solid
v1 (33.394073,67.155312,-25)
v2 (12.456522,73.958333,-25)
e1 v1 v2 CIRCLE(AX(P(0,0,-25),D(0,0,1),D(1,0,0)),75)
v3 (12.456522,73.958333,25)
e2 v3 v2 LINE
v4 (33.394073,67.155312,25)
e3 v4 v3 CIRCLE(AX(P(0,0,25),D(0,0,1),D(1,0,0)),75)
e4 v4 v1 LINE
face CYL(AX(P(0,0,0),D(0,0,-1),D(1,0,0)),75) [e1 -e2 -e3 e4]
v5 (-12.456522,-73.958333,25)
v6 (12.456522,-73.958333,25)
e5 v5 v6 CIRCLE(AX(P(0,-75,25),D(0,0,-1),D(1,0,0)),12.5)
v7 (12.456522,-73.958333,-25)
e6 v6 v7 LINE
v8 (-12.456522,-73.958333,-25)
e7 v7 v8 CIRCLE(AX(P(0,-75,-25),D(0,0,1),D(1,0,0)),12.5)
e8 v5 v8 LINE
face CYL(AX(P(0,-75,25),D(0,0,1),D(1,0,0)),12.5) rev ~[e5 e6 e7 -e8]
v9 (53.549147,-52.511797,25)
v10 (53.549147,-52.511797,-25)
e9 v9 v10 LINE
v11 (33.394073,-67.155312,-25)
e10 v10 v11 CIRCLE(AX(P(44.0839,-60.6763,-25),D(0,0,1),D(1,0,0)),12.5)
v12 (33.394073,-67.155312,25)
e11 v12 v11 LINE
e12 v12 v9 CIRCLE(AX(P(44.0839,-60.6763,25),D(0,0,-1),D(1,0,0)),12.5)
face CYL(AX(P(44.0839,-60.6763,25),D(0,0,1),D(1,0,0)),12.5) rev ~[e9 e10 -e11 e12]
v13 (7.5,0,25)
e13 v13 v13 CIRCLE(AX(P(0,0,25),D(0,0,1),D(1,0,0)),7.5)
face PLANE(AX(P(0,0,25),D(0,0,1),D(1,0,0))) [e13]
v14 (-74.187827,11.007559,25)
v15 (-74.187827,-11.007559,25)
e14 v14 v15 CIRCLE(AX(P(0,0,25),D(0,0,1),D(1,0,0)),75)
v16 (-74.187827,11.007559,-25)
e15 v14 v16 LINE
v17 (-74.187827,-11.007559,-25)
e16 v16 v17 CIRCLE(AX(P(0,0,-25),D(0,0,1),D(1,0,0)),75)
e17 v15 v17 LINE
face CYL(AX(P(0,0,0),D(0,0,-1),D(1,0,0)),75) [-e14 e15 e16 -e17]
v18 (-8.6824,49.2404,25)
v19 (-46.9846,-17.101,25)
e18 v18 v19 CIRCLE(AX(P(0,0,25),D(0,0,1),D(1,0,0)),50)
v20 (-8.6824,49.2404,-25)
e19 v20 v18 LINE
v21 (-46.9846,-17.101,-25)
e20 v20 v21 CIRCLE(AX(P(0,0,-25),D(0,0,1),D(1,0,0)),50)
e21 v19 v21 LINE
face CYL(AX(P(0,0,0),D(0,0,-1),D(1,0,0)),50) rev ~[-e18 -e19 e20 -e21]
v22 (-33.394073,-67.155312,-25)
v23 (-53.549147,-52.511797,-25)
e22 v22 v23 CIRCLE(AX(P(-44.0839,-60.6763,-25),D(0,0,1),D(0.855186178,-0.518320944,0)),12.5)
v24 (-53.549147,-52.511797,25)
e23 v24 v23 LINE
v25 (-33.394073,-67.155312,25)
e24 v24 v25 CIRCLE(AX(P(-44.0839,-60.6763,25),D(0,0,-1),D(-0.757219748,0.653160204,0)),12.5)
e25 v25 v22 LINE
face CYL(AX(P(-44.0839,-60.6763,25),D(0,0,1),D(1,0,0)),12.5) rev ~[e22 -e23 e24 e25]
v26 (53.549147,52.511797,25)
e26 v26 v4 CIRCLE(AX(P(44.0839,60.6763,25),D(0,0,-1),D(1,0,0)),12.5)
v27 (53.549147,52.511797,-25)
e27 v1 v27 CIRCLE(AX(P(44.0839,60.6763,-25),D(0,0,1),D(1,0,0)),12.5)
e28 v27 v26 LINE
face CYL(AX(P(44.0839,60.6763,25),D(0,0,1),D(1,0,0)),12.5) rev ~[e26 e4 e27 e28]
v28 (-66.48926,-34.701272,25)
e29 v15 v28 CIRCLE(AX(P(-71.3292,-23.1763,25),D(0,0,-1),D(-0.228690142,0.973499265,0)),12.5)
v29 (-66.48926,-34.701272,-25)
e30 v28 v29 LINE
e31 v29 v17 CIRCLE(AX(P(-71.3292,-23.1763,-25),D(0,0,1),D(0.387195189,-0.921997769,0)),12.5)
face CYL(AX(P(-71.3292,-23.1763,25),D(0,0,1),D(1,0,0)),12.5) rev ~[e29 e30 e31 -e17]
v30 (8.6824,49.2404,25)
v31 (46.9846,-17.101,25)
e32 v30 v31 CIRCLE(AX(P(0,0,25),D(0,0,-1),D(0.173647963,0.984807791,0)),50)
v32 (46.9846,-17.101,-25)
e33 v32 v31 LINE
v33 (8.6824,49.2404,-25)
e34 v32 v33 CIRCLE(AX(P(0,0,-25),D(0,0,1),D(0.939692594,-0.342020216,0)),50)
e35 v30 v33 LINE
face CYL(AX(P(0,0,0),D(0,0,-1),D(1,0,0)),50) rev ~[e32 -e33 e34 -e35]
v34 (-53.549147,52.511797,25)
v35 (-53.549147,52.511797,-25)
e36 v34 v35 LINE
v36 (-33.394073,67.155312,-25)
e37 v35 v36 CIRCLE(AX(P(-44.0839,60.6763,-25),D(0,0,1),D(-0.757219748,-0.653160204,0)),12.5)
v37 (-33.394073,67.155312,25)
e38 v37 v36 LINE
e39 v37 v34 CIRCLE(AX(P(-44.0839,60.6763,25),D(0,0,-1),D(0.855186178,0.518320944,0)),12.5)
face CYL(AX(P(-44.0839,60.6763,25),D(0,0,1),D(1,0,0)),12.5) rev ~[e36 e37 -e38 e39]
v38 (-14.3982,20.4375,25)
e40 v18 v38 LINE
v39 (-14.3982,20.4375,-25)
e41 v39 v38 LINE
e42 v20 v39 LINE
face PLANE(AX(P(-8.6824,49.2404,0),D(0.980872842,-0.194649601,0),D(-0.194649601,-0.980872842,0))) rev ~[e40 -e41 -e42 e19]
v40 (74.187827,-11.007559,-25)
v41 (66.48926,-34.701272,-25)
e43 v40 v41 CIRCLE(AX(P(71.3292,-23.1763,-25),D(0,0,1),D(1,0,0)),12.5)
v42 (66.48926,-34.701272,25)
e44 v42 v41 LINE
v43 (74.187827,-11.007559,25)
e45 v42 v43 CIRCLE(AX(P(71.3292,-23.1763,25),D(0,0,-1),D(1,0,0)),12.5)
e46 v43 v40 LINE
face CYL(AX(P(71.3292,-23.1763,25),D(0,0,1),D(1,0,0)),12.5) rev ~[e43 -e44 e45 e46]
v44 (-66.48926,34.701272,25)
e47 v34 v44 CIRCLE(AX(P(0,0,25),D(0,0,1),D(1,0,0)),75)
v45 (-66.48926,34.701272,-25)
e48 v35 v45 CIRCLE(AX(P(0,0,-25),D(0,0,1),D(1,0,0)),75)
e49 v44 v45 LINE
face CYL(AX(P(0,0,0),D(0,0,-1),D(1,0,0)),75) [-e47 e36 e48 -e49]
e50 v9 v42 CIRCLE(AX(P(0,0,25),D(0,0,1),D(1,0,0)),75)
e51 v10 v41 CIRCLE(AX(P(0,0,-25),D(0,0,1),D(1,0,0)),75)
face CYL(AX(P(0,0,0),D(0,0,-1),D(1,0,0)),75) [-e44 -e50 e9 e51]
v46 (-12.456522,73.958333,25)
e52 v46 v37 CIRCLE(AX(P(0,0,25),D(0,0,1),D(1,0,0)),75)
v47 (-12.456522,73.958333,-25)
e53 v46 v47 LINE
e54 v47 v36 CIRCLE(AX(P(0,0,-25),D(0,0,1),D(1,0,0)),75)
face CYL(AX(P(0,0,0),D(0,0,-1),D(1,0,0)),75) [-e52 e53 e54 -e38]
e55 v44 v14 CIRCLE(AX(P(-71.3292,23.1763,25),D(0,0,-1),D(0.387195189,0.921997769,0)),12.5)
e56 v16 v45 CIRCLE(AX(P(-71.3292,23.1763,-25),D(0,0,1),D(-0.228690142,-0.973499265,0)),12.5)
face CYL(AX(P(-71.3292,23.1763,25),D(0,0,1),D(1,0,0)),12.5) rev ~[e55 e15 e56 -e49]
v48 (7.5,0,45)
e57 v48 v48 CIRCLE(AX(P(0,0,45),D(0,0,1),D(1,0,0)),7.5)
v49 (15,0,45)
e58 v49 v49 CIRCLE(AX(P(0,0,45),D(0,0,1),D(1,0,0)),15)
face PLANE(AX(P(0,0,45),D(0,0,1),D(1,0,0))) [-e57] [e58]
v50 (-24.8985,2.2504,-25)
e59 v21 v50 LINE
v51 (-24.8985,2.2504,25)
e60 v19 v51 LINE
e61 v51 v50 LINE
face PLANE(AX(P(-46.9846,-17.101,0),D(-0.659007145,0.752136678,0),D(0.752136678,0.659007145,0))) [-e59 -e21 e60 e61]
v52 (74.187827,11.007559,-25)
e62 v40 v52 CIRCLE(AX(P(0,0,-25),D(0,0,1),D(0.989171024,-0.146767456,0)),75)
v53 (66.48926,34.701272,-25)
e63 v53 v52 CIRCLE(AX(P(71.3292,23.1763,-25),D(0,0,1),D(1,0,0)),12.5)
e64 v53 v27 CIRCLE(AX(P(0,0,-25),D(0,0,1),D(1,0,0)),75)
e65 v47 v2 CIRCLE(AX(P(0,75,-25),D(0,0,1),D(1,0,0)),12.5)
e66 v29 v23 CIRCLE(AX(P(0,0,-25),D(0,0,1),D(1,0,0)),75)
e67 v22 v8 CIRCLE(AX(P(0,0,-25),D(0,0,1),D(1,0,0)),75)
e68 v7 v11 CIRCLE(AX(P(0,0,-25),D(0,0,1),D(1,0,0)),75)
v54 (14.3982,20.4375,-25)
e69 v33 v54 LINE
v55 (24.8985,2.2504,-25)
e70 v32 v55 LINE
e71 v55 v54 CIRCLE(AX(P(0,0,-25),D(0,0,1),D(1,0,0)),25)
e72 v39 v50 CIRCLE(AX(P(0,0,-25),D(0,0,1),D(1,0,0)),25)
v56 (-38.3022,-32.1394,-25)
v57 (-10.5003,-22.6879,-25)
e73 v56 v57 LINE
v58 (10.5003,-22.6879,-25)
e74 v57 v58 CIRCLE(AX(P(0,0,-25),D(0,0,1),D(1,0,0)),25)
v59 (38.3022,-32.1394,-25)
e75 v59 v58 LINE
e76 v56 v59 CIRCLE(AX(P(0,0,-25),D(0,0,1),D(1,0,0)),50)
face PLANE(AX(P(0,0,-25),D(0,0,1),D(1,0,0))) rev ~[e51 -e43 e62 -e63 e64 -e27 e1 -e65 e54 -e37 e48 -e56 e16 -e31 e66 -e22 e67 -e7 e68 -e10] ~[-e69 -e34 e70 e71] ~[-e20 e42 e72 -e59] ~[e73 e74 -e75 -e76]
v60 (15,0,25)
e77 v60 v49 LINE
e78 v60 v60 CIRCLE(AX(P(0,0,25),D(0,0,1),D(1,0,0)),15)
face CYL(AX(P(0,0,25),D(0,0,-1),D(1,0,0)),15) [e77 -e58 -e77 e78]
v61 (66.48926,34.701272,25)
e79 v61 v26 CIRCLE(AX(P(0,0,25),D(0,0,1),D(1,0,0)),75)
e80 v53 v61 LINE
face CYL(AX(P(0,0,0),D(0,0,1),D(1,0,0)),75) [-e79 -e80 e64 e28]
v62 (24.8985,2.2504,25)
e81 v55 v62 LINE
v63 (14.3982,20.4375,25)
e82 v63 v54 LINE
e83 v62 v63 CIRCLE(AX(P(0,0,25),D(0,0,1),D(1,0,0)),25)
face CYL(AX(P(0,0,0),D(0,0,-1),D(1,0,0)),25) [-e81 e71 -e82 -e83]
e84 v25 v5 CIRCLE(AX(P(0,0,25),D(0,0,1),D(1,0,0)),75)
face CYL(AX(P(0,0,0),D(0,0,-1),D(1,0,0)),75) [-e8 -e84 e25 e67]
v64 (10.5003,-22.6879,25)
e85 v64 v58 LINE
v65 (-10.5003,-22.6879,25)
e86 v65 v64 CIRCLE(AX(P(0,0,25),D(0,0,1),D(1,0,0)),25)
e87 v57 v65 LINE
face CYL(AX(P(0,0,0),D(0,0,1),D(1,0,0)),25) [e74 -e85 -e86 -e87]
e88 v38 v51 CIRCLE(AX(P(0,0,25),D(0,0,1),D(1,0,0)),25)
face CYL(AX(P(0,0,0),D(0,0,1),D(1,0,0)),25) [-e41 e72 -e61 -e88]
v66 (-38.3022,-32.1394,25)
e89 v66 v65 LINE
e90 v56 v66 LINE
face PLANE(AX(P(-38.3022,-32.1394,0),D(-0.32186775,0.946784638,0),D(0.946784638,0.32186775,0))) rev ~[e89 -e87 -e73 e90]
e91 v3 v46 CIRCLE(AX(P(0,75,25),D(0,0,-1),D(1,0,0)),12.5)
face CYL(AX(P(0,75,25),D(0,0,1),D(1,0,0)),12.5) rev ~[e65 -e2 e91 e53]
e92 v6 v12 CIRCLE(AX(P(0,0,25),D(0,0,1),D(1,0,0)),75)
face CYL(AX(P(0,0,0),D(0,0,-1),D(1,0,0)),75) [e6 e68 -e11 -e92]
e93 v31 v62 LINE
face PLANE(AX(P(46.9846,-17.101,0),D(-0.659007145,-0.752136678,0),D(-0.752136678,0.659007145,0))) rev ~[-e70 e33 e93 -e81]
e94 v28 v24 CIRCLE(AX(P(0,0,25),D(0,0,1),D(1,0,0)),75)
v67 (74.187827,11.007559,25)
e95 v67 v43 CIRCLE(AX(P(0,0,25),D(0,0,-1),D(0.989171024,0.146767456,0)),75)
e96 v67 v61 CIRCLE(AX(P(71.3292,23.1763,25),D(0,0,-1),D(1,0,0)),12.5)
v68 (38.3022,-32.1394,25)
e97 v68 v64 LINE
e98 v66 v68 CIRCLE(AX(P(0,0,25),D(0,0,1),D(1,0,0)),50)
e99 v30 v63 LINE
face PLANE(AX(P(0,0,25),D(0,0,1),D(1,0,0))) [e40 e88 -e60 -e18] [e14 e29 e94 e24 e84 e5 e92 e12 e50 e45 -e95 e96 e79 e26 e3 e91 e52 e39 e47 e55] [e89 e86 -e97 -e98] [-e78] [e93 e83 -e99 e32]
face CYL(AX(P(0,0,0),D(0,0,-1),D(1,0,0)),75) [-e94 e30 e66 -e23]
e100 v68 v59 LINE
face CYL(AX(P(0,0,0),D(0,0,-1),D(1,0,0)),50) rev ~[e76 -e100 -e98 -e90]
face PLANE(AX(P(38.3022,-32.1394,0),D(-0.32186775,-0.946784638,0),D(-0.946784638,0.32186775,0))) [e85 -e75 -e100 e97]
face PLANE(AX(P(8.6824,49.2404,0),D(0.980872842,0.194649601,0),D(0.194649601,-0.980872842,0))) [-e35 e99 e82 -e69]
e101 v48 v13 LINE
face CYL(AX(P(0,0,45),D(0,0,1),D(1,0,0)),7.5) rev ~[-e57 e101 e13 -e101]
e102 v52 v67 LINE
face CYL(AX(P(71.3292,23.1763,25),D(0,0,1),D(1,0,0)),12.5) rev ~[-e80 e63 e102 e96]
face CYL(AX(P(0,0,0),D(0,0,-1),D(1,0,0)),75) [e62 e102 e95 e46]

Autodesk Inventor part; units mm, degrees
ref_plane "YZ Plane" through (0, 0, 0) normal (1, 0, 0) x (0, 1, 0)
ref_plane "XZ Plane" through (0, 0, 0) normal (0, 1, 0) x (-1, 0, 0)
ref_plane "XY Plane" through (0, 0, 0) normal (0, 0, 1) x (1, 0, 0)
sketch "Sketch1" plane through (0, 0, 0) normal (0, 0, 1) x (1, 0, 0)
  circle A0 centre (0, 0) radius 75
  dimension "d0" = 150
extrude "Extrusion1" add sketch "Sketch1" along normal mid plane 50
sketch "Sketch2" plane through (0, 0, 0) normal (0, 0, 1) x (1, 0, 0)
  circle A0 centre (0, 0) radius 50
  dimension "d3" = 100
extrude "Extrusion2" cut sketch "Sketch2" along normal mid plane 50
sketch "Sketch3" plane through (0, 0, 0) normal (0, 0, 1) x (1, 0, 0)
  circle A0 centre (0, 0) radius 25
  dimension "d6" = 50
extrude "Extrusion3" add sketch "Sketch3" along normal mid plane 50
sketch "Sketch10" plane through (0, 0, 25) normal (0, 0, 1) x (1, 0, 0)
  circle A0 centre (0, 0) radius 75 projected
  circle A1 centre (0, 75) radius 12.5
  circle A2 centre (-44.0839, 60.6763) radius 12.5
  circle A3 centre (-71.3292, 23.1763) radius 12.5
  circle A4 centre (-71.3292, -23.1763) radius 12.5
  circle A5 centre (-44.0839, -60.6763) radius 12.5
  circle A6 centre (0, -75) radius 12.5
  circle A7 centre (44.0839, -60.6763) radius 12.5
  circle A8 centre (71.3292, -23.1763) radius 12.5
  circle A9 centre (71.3292, 23.1763) radius 12.5
  circle A10 centre (44.0839, 60.6763) radius 12.5
  dimension "d46" = 25
  dimension "d49" = 360
extrude "Extrusion9" cut sketch "Sketch10" against normal through all contours A9 A0 | A0 A9 | A8 A0 | A0 A8 | A10 A0 | A0 A10 | A7 A0 | A0 A7 | A1 A0 | A0 A1 | A6 A0 | A0 A6 | A2 A0 | A0 A2 | A5 A0 | A0 A5 | A3 A0 | A0 A3 | A4 A0 | A0 A4
sketch "Sketch11" plane through (0, 0, 0) normal (0, 0, 1) x (1, 0, 0)
  circle A0 centre (0, 0) radius 25 construction
  circle A1 centre (0, 0) radius 50 construction
  line L0 (0, 0) -> (50, 0) construction
  line L1 (-8.6824, 49.2404) -> (-14.3982, 20.4375)
  line L2 (8.6824, 49.2404) -> (14.3982, 20.4375)
  line L3 (-38.3022, -32.1394) -> (-10.5003, -22.6879)
  line L4 (-46.9846, -17.101) -> (-24.8985, 2.2504)
  line L5 (46.9846, -17.101) -> (24.8985, 2.2504)
  line L6 (38.3022, -32.1394) -> (10.5003, -22.6879)
  arc A2 (8.6824, 49.2404) -> (-8.6824, 49.2404) centre (0, 0) ccw
  arc A3 (-46.9846, -17.101) -> (-38.3022, -32.1394) centre (0, 0) ccw
  arc A4 (38.3022, -32.1394) -> (50, 0) centre (0, 0) ccw
  arc A5 (10.5003, -22.6879) -> (24.8985, 2.2504) centre (0, 0) ccw
  arc A6 (14.3982, 20.4375) -> (-14.3982, 20.4375) centre (0, 0) ccw
  arc A7 (-24.8985, 2.2504) -> (-10.5003, -22.6879) centre (0, 0) ccw
  dimension "d56" = 360
extrude "Extrusion10" add sketch "Sketch11" along normal mid plane 50
sketch "Sketch12" plane through (0, 0, 25) normal (0, 0, 1) x (1, 0, 0)
  circle A0 centre (0, 0) radius 15
  dimension "d60" = 30
extrude "Extrusion11" add sketch "Sketch12" along normal blind 20
sketch "Sketch13" plane through (0, 0, 45) normal (0, 0, 1) x (1, 0, 0)
  circle A0 centre (0, 0) radius 7.5
  dimension "d63" = 15
extrude "Extrusion12" cut sketch "Sketch13" against normal blind 20
properties part number "Guntas_Wheel_New"
